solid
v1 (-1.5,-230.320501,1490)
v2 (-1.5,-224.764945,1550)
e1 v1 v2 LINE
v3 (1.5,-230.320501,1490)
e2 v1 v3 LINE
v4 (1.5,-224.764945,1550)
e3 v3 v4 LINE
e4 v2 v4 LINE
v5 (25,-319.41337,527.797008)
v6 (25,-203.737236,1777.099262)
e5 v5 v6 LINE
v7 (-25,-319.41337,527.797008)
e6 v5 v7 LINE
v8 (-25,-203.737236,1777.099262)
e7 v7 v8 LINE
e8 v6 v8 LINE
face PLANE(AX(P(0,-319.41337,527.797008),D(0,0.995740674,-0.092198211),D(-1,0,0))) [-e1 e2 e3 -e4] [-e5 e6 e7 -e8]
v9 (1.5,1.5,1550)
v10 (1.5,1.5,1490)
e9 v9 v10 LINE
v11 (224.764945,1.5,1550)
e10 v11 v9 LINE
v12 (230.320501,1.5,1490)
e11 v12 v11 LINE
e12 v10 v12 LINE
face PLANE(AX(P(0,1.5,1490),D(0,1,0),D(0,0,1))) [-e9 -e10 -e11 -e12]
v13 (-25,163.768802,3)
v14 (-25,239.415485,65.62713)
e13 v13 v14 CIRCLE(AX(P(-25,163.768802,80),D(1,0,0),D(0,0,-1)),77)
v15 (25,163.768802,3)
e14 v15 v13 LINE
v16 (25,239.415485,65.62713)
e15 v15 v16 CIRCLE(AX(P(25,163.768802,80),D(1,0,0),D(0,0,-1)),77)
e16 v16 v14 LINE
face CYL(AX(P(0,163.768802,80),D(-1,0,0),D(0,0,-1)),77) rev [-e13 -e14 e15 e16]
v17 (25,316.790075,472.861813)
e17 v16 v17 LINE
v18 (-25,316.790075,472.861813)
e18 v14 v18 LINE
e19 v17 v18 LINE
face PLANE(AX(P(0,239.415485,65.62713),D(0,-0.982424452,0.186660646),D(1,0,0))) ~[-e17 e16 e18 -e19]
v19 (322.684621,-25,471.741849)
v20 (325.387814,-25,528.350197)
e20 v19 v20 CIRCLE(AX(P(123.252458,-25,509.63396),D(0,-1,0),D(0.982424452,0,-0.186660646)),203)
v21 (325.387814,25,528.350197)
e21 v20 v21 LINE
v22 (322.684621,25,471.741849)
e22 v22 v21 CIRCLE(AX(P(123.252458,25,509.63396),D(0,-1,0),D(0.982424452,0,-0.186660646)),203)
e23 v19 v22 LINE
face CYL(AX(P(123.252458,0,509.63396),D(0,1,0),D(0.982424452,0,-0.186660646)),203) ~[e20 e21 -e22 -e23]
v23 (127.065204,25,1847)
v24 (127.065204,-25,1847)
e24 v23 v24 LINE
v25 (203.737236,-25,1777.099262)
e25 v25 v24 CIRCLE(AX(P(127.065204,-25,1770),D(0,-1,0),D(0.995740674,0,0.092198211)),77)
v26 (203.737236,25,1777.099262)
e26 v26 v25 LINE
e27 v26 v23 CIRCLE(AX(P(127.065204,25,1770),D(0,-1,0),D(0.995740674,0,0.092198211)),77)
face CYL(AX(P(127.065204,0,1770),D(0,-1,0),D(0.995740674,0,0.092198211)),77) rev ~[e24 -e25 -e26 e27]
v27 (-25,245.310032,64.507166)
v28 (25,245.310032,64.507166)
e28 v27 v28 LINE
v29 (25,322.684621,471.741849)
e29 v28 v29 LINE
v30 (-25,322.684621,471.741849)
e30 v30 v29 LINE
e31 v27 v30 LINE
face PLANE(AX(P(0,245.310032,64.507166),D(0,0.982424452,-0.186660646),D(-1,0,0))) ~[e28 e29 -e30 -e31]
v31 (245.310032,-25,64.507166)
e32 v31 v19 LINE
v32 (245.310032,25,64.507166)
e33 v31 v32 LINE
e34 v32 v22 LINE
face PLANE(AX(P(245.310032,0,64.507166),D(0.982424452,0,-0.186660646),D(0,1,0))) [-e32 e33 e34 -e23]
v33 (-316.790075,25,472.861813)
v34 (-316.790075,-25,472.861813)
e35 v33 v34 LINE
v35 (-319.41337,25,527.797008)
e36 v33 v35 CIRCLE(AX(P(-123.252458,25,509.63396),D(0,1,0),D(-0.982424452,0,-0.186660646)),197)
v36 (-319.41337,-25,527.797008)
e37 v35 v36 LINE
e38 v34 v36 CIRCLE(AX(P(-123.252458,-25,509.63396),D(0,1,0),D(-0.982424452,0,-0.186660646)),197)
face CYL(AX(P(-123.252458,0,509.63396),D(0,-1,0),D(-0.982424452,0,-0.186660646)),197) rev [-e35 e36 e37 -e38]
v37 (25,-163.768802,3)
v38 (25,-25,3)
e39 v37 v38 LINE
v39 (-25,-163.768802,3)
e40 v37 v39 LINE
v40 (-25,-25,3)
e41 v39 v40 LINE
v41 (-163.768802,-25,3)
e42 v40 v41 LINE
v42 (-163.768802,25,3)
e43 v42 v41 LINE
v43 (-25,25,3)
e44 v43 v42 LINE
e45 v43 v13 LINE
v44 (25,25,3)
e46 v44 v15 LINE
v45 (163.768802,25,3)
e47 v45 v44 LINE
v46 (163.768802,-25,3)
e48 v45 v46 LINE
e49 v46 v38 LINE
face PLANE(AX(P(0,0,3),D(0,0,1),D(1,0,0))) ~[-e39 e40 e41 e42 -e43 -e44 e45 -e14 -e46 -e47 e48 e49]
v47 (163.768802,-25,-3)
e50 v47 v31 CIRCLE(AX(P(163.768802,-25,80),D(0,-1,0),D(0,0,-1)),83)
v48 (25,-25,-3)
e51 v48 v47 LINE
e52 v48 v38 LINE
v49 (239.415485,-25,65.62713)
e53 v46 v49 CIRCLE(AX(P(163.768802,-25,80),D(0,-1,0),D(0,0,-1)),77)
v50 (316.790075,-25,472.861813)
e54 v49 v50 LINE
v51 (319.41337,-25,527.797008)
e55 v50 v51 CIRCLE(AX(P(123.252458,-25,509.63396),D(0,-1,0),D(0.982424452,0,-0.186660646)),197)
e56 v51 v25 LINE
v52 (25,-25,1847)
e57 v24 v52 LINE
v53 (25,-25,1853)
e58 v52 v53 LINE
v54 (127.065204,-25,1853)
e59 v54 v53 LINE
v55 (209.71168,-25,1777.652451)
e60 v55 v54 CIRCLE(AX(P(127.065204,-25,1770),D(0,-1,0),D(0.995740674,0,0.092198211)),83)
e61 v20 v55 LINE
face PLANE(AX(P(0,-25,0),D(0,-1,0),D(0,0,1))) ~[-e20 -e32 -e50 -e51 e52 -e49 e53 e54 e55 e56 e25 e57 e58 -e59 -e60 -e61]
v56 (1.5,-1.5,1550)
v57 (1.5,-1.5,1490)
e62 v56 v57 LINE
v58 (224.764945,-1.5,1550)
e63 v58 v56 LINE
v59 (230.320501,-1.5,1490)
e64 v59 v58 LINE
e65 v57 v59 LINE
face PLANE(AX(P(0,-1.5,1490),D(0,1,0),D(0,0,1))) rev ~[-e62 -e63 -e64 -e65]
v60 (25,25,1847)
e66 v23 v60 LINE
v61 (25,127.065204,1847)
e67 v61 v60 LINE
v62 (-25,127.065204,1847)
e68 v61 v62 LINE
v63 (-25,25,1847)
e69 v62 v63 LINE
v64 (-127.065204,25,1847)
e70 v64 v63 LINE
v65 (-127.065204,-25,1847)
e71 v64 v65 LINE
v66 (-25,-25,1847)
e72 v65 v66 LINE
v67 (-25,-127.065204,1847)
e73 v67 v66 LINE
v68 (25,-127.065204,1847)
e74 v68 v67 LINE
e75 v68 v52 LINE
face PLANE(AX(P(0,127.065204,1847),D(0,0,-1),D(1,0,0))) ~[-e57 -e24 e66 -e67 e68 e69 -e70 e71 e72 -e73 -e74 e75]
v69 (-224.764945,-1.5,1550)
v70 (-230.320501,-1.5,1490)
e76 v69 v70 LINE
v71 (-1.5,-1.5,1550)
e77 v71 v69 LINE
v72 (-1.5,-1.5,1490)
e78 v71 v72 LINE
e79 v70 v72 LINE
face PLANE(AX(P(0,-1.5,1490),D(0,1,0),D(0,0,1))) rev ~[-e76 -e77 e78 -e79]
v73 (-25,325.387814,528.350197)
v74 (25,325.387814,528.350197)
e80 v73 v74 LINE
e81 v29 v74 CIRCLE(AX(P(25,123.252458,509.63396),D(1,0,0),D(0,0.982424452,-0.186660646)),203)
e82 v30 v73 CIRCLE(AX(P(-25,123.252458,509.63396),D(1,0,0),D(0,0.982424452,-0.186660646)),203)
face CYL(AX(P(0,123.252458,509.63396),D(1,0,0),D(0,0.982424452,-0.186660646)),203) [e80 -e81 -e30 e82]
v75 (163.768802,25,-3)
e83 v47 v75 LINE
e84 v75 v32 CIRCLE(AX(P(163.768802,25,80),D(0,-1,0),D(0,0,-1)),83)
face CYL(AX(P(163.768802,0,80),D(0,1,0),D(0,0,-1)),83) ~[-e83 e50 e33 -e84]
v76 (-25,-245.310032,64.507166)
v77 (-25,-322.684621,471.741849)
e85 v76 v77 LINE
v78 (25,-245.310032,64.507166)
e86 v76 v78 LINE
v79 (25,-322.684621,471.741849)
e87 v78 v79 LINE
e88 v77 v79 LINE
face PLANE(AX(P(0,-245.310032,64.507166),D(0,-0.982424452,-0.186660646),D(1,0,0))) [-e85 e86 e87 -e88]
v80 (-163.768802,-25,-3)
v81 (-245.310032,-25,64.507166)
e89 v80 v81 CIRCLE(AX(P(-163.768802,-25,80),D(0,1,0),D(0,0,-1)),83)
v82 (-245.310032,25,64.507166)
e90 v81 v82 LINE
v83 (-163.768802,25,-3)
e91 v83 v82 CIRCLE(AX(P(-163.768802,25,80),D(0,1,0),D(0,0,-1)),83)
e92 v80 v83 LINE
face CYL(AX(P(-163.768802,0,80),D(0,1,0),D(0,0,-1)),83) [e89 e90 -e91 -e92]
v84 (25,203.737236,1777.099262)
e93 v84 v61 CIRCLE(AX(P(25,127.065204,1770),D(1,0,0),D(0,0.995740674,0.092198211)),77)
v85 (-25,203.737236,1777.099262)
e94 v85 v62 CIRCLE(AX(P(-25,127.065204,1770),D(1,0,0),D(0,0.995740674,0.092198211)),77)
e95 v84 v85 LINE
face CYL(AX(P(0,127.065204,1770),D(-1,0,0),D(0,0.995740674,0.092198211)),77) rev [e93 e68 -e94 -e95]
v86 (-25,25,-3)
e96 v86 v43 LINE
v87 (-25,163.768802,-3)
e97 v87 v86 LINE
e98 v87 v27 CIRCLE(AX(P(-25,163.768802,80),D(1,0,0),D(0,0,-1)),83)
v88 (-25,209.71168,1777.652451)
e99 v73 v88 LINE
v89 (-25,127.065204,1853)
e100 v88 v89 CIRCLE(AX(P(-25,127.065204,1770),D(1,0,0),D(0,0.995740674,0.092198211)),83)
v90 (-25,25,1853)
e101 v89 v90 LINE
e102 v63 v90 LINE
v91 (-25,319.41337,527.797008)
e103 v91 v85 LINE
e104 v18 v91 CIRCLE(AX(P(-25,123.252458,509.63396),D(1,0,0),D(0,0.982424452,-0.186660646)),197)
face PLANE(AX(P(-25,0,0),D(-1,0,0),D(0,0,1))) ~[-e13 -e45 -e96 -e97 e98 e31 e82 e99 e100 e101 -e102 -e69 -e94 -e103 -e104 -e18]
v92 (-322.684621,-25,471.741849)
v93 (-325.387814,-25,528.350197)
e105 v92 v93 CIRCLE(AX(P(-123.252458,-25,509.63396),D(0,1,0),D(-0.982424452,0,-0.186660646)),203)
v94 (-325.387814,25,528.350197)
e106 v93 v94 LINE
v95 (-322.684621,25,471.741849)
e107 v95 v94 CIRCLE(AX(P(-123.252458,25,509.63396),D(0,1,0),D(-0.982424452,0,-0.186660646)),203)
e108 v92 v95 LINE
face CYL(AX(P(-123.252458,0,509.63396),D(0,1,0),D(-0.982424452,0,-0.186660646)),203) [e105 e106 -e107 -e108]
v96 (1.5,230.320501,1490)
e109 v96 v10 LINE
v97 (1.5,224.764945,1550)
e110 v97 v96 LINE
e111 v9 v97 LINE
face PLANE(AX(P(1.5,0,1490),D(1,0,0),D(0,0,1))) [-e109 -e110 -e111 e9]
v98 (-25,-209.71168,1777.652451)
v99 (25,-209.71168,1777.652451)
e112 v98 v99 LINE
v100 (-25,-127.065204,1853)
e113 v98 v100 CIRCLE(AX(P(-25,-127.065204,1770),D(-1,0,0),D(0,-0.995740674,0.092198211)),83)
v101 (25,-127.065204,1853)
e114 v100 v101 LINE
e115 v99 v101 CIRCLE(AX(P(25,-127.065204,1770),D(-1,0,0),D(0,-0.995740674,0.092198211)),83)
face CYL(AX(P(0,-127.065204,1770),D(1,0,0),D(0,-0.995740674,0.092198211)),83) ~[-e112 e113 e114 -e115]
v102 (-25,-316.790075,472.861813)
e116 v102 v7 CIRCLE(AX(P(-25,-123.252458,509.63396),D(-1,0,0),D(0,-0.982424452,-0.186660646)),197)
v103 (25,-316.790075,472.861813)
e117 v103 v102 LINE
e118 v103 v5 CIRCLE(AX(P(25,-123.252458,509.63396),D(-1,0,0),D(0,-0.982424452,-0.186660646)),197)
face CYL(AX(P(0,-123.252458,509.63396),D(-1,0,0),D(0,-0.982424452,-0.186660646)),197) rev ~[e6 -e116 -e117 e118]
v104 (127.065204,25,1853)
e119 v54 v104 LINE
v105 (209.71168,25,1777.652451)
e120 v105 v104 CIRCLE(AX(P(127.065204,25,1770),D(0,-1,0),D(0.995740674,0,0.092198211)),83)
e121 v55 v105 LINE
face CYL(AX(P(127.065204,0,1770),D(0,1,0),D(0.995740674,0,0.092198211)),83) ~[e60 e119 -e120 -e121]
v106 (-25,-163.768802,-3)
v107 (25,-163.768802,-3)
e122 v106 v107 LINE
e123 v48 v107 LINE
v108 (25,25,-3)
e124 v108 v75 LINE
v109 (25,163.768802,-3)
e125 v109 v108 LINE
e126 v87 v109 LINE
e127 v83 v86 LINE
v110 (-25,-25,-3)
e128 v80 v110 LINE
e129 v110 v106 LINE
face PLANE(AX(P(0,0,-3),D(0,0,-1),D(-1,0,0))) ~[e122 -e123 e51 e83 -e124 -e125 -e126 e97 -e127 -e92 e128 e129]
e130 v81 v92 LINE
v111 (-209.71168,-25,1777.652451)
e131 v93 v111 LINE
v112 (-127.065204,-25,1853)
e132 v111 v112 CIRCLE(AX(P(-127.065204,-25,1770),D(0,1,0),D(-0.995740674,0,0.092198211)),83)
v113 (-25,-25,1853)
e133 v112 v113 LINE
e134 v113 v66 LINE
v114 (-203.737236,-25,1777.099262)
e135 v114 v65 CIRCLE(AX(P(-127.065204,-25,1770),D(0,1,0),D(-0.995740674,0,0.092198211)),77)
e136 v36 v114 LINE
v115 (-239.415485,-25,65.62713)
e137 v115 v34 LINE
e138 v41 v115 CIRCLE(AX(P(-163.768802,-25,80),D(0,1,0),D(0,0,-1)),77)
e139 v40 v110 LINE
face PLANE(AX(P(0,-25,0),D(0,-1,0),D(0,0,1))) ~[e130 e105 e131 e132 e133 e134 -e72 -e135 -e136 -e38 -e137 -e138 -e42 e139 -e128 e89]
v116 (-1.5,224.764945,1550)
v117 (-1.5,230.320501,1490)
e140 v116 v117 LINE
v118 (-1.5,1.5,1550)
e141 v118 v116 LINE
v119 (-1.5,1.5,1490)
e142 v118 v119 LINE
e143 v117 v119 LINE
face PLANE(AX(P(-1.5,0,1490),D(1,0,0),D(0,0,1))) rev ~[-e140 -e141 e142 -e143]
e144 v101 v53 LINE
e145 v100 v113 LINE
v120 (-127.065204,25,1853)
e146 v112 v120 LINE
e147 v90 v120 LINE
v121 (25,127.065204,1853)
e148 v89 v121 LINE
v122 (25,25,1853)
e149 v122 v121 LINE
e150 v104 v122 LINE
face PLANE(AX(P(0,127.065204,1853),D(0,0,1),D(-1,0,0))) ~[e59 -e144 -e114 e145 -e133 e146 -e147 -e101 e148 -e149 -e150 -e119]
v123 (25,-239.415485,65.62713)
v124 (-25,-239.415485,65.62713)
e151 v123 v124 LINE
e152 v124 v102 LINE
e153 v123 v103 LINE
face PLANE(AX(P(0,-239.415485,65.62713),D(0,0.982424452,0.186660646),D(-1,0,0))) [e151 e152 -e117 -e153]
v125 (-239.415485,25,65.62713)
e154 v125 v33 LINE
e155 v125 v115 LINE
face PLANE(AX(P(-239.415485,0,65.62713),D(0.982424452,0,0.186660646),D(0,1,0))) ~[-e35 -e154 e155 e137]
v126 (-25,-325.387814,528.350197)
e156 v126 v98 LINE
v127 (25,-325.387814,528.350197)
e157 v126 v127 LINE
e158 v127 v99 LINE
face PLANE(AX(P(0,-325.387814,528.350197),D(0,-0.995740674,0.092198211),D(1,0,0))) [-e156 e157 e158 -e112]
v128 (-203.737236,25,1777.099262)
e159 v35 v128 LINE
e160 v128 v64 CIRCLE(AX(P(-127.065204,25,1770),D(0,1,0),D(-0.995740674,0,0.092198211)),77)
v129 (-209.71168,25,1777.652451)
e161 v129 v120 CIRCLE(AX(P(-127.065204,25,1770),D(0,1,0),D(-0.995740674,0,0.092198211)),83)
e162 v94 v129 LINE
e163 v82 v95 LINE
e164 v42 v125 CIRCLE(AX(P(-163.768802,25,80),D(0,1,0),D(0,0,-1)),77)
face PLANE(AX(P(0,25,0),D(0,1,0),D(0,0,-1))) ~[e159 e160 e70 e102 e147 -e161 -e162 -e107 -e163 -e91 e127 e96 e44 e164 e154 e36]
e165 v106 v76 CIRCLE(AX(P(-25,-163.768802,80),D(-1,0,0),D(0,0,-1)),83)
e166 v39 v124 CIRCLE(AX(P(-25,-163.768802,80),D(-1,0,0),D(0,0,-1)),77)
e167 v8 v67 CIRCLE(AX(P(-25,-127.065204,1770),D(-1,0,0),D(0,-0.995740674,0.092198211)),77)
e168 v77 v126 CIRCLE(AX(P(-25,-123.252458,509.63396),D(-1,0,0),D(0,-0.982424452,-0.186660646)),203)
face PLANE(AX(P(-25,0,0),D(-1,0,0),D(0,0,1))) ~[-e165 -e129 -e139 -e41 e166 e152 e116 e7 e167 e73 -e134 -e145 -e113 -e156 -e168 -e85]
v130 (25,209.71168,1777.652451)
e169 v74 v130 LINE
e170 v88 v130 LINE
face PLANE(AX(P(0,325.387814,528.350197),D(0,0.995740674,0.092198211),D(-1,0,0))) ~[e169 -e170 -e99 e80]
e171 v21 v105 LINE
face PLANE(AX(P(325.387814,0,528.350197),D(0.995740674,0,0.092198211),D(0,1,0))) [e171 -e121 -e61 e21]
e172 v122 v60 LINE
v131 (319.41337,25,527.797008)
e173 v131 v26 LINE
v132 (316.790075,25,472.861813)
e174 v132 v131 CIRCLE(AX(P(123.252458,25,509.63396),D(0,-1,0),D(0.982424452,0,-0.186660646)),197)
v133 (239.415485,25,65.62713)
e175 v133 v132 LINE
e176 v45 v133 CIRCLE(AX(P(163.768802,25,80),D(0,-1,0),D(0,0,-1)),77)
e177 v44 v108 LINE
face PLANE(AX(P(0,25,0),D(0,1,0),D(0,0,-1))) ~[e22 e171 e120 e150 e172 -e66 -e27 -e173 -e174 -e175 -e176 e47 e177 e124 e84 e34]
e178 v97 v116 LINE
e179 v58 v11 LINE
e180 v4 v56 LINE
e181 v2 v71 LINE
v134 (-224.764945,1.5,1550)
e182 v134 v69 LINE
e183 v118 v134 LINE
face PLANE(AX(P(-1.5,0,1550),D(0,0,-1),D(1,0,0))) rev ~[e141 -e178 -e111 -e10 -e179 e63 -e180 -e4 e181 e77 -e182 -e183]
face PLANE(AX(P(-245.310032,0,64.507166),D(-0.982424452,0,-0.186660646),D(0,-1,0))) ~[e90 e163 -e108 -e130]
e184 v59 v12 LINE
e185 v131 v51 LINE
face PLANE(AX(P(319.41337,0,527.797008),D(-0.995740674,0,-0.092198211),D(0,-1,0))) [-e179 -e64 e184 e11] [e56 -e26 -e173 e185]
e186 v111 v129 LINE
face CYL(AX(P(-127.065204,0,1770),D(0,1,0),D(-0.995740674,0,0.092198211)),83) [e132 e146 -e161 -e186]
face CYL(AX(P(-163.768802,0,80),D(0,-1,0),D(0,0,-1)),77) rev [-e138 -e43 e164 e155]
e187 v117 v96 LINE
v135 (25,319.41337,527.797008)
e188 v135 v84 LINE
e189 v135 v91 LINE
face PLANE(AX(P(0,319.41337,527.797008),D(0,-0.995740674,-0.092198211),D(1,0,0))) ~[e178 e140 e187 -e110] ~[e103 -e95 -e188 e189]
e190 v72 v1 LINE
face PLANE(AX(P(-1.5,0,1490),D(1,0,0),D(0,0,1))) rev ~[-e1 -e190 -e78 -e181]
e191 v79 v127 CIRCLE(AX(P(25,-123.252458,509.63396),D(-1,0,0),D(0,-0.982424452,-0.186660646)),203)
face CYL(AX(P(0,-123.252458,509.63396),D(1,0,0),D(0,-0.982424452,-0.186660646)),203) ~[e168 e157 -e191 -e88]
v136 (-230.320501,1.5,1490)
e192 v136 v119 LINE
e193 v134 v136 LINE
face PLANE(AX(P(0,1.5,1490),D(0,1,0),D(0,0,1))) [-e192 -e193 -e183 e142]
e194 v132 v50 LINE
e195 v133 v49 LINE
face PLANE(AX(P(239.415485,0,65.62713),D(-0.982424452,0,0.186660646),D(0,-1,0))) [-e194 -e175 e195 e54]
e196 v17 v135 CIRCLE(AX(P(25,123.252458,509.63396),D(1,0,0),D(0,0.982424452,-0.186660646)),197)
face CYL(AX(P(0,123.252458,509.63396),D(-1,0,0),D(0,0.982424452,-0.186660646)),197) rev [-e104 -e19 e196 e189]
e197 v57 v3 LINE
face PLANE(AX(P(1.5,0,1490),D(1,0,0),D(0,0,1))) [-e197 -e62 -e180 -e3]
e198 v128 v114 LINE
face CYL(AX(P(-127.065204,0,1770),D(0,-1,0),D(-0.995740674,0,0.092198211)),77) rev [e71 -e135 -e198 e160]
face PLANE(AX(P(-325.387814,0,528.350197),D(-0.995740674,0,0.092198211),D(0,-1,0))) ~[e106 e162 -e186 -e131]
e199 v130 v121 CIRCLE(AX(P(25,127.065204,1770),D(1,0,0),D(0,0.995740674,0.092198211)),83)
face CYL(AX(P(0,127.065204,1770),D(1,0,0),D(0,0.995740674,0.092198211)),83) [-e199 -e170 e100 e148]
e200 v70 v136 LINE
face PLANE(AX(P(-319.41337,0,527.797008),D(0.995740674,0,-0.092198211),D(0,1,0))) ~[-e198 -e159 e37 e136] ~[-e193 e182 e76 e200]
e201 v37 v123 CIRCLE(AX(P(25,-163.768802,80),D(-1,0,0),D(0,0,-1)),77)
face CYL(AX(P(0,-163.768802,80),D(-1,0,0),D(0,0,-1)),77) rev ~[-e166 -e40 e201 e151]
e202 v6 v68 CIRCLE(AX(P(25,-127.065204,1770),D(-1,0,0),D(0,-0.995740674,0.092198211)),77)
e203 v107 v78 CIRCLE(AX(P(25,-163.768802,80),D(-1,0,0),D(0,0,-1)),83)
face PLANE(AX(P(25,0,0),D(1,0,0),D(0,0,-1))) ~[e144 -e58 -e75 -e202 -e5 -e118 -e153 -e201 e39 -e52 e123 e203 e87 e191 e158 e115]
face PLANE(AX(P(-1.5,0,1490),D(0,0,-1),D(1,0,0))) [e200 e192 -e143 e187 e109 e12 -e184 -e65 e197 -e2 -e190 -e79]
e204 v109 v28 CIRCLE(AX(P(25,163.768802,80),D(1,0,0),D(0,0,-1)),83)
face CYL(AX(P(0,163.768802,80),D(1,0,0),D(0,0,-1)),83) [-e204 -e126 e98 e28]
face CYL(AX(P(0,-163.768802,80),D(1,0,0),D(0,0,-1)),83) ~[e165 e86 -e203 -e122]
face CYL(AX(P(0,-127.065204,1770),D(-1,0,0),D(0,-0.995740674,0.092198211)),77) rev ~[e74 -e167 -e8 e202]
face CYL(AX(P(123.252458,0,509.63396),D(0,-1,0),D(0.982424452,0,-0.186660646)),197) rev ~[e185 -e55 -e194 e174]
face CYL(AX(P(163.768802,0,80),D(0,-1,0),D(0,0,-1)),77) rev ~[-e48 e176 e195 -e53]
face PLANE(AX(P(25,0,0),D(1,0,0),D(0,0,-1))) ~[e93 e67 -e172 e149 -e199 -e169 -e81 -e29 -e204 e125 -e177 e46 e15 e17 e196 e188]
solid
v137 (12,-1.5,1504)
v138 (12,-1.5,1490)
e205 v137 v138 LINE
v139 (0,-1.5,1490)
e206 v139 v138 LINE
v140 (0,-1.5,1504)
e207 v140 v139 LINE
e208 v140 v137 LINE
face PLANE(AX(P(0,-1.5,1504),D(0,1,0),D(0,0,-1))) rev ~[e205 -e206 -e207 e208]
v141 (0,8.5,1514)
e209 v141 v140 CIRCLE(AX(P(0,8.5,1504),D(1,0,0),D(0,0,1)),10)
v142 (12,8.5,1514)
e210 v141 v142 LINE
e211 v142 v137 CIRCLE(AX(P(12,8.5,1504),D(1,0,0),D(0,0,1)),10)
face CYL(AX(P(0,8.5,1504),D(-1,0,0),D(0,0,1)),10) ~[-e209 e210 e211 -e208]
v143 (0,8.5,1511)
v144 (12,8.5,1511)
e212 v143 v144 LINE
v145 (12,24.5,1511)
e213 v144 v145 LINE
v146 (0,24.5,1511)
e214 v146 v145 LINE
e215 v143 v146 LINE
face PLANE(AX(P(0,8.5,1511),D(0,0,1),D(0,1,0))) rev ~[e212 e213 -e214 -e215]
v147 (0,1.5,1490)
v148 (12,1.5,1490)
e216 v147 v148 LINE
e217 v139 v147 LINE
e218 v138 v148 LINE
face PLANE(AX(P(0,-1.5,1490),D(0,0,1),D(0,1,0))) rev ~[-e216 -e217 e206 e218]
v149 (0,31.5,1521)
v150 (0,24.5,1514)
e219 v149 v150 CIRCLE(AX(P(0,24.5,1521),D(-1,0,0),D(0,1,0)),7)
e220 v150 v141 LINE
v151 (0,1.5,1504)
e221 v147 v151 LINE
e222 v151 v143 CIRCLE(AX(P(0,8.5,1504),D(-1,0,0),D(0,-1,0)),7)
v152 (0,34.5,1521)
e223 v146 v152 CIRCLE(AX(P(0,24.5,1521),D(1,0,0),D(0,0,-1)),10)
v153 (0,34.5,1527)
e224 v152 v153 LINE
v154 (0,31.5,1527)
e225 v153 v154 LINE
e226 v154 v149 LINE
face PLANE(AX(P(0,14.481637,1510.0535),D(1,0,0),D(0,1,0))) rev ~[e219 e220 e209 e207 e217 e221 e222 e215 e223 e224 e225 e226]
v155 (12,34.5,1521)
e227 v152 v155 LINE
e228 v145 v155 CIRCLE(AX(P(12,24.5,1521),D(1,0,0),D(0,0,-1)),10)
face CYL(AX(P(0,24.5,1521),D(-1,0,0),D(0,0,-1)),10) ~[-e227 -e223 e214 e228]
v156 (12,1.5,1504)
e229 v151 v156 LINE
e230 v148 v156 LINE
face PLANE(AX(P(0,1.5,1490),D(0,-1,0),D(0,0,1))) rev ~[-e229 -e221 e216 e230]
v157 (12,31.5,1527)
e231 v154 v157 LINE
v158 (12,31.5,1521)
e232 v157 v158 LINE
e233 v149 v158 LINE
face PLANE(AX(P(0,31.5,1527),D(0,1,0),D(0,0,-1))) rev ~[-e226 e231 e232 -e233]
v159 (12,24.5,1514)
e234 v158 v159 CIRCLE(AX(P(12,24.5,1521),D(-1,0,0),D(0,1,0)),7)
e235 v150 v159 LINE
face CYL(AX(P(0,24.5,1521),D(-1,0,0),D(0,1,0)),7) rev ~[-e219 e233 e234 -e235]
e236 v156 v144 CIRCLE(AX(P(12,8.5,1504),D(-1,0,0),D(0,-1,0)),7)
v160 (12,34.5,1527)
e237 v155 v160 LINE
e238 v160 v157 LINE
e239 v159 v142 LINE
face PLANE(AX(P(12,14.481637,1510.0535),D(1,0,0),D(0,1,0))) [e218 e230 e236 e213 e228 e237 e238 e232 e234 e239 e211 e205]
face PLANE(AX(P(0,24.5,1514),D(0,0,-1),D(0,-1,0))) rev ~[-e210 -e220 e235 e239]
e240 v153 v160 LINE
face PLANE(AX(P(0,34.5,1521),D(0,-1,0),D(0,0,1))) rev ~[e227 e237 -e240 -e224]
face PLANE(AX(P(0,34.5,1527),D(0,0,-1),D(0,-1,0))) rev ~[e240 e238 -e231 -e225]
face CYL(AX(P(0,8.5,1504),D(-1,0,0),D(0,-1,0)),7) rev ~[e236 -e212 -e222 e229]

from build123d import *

# Parameters (mm, degrees)
F2_W          = 50
F2_H          = 6
F6_DEPTH      = 12
F4_W          = 3
F4_H          = 60
F8_DEPTH      = 230.3205006971
F8_DEPTH_BACK = 230.3205006971
F9_COUNT      = 3
F9_ANGLE      = 180


with BuildPart() as f3:
    # F3: sweep along a path in F1
    with BuildLine(Plane.XZ) as f3_path:
        Line((0, 0), (163.7688020474, 0))
        ThreePointArc((163.7688020474, 0), (214.7853281283, 18.3776496177), (242.3627581835, 65.0671483341))
        Line((242.3627581835, 65.0671483341), (319.737347904, 472.3018310739))
        ThreePointArc((319.737347904, 472.3018310739), (323.0248161759, 500.0943200705), (322.4005923749, 528.0736023507))
        Line((322.4005923749, 528.0736023507), (206.7244576996, 1777.3758568449))
        ThreePointArc((206.7244576996, 1777.3758568449), (180.9629377368, 1829.1188148883), (127.0652037751, 1850))
        Line((127.0652037751, 1850), (0, 1850))
    # F2 (on Right) → F3 (sweep)
    with BuildSketch(Plane.YZ):
        Rectangle(F2_W, F2_H)
    sweep(path=f3_path.line)

    # F7: F3 across plane


with BuildPart() as f6:
    # F5 (on Right) → F6 (new body)
    with BuildSketch(Plane.YZ):
        with BuildLine():
            Line((-1.5, 1490), (1.5, 1490))
            Line((1.5, 1490), (1.5, 1504))
            ThreePointArc((1.5, 1504), (3.5502525317, 1508.9497474683), (8.5, 1511))
            Line((8.5, 1511), (24.5, 1511))
            ThreePointArc((24.5, 1511), (31.5710678119, 1513.9289321881), (34.5, 1521))
            Line((34.5, 1521), (34.5, 1527))
            Line((34.5, 1527), (31.5, 1527))
            Line((31.5, 1527), (31.5, 1521))
            ThreePointArc((31.5, 1521), (29.4497474683, 1516.0502525317), (24.5, 1514))
            Line((24.5, 1514), (8.5, 1514))
            ThreePointArc((8.5, 1514), (1.4289321881, 1511.0710678119), (-1.5, 1504))
            Line((-1.5, 1504), (-1.5, 1490))
        make_face()
    extrude(amount=F6_DEPTH)


with BuildPart() as f3_1:
    add(f3.part)
    add(f3.part.mirror(Plane.YZ))

    # F4 (on Right) → F8 (join, two sides)
    with BuildSketch(Plane.YZ) as f8_sk:
        with Locations((0, 1520)):
            Rectangle(F4_W, F4_H)
    extrude(amount=F8_DEPTH)
    extrude(f8_sk.sketch, amount=-F8_DEPTH_BACK)

    # F9: F3 ×3 about axis
    f9_axis = Axis((0, 0, 925), (0, 0, -1))


with BuildPart() as f3_2:
    add(f3_1.part)
    for i in range(1, F9_COUNT):
        add(f3_1.part.rotate(f9_axis, i * F9_ANGLE / (F9_COUNT - 1)))


solid = Compound([f6.part, f3_2.part])
